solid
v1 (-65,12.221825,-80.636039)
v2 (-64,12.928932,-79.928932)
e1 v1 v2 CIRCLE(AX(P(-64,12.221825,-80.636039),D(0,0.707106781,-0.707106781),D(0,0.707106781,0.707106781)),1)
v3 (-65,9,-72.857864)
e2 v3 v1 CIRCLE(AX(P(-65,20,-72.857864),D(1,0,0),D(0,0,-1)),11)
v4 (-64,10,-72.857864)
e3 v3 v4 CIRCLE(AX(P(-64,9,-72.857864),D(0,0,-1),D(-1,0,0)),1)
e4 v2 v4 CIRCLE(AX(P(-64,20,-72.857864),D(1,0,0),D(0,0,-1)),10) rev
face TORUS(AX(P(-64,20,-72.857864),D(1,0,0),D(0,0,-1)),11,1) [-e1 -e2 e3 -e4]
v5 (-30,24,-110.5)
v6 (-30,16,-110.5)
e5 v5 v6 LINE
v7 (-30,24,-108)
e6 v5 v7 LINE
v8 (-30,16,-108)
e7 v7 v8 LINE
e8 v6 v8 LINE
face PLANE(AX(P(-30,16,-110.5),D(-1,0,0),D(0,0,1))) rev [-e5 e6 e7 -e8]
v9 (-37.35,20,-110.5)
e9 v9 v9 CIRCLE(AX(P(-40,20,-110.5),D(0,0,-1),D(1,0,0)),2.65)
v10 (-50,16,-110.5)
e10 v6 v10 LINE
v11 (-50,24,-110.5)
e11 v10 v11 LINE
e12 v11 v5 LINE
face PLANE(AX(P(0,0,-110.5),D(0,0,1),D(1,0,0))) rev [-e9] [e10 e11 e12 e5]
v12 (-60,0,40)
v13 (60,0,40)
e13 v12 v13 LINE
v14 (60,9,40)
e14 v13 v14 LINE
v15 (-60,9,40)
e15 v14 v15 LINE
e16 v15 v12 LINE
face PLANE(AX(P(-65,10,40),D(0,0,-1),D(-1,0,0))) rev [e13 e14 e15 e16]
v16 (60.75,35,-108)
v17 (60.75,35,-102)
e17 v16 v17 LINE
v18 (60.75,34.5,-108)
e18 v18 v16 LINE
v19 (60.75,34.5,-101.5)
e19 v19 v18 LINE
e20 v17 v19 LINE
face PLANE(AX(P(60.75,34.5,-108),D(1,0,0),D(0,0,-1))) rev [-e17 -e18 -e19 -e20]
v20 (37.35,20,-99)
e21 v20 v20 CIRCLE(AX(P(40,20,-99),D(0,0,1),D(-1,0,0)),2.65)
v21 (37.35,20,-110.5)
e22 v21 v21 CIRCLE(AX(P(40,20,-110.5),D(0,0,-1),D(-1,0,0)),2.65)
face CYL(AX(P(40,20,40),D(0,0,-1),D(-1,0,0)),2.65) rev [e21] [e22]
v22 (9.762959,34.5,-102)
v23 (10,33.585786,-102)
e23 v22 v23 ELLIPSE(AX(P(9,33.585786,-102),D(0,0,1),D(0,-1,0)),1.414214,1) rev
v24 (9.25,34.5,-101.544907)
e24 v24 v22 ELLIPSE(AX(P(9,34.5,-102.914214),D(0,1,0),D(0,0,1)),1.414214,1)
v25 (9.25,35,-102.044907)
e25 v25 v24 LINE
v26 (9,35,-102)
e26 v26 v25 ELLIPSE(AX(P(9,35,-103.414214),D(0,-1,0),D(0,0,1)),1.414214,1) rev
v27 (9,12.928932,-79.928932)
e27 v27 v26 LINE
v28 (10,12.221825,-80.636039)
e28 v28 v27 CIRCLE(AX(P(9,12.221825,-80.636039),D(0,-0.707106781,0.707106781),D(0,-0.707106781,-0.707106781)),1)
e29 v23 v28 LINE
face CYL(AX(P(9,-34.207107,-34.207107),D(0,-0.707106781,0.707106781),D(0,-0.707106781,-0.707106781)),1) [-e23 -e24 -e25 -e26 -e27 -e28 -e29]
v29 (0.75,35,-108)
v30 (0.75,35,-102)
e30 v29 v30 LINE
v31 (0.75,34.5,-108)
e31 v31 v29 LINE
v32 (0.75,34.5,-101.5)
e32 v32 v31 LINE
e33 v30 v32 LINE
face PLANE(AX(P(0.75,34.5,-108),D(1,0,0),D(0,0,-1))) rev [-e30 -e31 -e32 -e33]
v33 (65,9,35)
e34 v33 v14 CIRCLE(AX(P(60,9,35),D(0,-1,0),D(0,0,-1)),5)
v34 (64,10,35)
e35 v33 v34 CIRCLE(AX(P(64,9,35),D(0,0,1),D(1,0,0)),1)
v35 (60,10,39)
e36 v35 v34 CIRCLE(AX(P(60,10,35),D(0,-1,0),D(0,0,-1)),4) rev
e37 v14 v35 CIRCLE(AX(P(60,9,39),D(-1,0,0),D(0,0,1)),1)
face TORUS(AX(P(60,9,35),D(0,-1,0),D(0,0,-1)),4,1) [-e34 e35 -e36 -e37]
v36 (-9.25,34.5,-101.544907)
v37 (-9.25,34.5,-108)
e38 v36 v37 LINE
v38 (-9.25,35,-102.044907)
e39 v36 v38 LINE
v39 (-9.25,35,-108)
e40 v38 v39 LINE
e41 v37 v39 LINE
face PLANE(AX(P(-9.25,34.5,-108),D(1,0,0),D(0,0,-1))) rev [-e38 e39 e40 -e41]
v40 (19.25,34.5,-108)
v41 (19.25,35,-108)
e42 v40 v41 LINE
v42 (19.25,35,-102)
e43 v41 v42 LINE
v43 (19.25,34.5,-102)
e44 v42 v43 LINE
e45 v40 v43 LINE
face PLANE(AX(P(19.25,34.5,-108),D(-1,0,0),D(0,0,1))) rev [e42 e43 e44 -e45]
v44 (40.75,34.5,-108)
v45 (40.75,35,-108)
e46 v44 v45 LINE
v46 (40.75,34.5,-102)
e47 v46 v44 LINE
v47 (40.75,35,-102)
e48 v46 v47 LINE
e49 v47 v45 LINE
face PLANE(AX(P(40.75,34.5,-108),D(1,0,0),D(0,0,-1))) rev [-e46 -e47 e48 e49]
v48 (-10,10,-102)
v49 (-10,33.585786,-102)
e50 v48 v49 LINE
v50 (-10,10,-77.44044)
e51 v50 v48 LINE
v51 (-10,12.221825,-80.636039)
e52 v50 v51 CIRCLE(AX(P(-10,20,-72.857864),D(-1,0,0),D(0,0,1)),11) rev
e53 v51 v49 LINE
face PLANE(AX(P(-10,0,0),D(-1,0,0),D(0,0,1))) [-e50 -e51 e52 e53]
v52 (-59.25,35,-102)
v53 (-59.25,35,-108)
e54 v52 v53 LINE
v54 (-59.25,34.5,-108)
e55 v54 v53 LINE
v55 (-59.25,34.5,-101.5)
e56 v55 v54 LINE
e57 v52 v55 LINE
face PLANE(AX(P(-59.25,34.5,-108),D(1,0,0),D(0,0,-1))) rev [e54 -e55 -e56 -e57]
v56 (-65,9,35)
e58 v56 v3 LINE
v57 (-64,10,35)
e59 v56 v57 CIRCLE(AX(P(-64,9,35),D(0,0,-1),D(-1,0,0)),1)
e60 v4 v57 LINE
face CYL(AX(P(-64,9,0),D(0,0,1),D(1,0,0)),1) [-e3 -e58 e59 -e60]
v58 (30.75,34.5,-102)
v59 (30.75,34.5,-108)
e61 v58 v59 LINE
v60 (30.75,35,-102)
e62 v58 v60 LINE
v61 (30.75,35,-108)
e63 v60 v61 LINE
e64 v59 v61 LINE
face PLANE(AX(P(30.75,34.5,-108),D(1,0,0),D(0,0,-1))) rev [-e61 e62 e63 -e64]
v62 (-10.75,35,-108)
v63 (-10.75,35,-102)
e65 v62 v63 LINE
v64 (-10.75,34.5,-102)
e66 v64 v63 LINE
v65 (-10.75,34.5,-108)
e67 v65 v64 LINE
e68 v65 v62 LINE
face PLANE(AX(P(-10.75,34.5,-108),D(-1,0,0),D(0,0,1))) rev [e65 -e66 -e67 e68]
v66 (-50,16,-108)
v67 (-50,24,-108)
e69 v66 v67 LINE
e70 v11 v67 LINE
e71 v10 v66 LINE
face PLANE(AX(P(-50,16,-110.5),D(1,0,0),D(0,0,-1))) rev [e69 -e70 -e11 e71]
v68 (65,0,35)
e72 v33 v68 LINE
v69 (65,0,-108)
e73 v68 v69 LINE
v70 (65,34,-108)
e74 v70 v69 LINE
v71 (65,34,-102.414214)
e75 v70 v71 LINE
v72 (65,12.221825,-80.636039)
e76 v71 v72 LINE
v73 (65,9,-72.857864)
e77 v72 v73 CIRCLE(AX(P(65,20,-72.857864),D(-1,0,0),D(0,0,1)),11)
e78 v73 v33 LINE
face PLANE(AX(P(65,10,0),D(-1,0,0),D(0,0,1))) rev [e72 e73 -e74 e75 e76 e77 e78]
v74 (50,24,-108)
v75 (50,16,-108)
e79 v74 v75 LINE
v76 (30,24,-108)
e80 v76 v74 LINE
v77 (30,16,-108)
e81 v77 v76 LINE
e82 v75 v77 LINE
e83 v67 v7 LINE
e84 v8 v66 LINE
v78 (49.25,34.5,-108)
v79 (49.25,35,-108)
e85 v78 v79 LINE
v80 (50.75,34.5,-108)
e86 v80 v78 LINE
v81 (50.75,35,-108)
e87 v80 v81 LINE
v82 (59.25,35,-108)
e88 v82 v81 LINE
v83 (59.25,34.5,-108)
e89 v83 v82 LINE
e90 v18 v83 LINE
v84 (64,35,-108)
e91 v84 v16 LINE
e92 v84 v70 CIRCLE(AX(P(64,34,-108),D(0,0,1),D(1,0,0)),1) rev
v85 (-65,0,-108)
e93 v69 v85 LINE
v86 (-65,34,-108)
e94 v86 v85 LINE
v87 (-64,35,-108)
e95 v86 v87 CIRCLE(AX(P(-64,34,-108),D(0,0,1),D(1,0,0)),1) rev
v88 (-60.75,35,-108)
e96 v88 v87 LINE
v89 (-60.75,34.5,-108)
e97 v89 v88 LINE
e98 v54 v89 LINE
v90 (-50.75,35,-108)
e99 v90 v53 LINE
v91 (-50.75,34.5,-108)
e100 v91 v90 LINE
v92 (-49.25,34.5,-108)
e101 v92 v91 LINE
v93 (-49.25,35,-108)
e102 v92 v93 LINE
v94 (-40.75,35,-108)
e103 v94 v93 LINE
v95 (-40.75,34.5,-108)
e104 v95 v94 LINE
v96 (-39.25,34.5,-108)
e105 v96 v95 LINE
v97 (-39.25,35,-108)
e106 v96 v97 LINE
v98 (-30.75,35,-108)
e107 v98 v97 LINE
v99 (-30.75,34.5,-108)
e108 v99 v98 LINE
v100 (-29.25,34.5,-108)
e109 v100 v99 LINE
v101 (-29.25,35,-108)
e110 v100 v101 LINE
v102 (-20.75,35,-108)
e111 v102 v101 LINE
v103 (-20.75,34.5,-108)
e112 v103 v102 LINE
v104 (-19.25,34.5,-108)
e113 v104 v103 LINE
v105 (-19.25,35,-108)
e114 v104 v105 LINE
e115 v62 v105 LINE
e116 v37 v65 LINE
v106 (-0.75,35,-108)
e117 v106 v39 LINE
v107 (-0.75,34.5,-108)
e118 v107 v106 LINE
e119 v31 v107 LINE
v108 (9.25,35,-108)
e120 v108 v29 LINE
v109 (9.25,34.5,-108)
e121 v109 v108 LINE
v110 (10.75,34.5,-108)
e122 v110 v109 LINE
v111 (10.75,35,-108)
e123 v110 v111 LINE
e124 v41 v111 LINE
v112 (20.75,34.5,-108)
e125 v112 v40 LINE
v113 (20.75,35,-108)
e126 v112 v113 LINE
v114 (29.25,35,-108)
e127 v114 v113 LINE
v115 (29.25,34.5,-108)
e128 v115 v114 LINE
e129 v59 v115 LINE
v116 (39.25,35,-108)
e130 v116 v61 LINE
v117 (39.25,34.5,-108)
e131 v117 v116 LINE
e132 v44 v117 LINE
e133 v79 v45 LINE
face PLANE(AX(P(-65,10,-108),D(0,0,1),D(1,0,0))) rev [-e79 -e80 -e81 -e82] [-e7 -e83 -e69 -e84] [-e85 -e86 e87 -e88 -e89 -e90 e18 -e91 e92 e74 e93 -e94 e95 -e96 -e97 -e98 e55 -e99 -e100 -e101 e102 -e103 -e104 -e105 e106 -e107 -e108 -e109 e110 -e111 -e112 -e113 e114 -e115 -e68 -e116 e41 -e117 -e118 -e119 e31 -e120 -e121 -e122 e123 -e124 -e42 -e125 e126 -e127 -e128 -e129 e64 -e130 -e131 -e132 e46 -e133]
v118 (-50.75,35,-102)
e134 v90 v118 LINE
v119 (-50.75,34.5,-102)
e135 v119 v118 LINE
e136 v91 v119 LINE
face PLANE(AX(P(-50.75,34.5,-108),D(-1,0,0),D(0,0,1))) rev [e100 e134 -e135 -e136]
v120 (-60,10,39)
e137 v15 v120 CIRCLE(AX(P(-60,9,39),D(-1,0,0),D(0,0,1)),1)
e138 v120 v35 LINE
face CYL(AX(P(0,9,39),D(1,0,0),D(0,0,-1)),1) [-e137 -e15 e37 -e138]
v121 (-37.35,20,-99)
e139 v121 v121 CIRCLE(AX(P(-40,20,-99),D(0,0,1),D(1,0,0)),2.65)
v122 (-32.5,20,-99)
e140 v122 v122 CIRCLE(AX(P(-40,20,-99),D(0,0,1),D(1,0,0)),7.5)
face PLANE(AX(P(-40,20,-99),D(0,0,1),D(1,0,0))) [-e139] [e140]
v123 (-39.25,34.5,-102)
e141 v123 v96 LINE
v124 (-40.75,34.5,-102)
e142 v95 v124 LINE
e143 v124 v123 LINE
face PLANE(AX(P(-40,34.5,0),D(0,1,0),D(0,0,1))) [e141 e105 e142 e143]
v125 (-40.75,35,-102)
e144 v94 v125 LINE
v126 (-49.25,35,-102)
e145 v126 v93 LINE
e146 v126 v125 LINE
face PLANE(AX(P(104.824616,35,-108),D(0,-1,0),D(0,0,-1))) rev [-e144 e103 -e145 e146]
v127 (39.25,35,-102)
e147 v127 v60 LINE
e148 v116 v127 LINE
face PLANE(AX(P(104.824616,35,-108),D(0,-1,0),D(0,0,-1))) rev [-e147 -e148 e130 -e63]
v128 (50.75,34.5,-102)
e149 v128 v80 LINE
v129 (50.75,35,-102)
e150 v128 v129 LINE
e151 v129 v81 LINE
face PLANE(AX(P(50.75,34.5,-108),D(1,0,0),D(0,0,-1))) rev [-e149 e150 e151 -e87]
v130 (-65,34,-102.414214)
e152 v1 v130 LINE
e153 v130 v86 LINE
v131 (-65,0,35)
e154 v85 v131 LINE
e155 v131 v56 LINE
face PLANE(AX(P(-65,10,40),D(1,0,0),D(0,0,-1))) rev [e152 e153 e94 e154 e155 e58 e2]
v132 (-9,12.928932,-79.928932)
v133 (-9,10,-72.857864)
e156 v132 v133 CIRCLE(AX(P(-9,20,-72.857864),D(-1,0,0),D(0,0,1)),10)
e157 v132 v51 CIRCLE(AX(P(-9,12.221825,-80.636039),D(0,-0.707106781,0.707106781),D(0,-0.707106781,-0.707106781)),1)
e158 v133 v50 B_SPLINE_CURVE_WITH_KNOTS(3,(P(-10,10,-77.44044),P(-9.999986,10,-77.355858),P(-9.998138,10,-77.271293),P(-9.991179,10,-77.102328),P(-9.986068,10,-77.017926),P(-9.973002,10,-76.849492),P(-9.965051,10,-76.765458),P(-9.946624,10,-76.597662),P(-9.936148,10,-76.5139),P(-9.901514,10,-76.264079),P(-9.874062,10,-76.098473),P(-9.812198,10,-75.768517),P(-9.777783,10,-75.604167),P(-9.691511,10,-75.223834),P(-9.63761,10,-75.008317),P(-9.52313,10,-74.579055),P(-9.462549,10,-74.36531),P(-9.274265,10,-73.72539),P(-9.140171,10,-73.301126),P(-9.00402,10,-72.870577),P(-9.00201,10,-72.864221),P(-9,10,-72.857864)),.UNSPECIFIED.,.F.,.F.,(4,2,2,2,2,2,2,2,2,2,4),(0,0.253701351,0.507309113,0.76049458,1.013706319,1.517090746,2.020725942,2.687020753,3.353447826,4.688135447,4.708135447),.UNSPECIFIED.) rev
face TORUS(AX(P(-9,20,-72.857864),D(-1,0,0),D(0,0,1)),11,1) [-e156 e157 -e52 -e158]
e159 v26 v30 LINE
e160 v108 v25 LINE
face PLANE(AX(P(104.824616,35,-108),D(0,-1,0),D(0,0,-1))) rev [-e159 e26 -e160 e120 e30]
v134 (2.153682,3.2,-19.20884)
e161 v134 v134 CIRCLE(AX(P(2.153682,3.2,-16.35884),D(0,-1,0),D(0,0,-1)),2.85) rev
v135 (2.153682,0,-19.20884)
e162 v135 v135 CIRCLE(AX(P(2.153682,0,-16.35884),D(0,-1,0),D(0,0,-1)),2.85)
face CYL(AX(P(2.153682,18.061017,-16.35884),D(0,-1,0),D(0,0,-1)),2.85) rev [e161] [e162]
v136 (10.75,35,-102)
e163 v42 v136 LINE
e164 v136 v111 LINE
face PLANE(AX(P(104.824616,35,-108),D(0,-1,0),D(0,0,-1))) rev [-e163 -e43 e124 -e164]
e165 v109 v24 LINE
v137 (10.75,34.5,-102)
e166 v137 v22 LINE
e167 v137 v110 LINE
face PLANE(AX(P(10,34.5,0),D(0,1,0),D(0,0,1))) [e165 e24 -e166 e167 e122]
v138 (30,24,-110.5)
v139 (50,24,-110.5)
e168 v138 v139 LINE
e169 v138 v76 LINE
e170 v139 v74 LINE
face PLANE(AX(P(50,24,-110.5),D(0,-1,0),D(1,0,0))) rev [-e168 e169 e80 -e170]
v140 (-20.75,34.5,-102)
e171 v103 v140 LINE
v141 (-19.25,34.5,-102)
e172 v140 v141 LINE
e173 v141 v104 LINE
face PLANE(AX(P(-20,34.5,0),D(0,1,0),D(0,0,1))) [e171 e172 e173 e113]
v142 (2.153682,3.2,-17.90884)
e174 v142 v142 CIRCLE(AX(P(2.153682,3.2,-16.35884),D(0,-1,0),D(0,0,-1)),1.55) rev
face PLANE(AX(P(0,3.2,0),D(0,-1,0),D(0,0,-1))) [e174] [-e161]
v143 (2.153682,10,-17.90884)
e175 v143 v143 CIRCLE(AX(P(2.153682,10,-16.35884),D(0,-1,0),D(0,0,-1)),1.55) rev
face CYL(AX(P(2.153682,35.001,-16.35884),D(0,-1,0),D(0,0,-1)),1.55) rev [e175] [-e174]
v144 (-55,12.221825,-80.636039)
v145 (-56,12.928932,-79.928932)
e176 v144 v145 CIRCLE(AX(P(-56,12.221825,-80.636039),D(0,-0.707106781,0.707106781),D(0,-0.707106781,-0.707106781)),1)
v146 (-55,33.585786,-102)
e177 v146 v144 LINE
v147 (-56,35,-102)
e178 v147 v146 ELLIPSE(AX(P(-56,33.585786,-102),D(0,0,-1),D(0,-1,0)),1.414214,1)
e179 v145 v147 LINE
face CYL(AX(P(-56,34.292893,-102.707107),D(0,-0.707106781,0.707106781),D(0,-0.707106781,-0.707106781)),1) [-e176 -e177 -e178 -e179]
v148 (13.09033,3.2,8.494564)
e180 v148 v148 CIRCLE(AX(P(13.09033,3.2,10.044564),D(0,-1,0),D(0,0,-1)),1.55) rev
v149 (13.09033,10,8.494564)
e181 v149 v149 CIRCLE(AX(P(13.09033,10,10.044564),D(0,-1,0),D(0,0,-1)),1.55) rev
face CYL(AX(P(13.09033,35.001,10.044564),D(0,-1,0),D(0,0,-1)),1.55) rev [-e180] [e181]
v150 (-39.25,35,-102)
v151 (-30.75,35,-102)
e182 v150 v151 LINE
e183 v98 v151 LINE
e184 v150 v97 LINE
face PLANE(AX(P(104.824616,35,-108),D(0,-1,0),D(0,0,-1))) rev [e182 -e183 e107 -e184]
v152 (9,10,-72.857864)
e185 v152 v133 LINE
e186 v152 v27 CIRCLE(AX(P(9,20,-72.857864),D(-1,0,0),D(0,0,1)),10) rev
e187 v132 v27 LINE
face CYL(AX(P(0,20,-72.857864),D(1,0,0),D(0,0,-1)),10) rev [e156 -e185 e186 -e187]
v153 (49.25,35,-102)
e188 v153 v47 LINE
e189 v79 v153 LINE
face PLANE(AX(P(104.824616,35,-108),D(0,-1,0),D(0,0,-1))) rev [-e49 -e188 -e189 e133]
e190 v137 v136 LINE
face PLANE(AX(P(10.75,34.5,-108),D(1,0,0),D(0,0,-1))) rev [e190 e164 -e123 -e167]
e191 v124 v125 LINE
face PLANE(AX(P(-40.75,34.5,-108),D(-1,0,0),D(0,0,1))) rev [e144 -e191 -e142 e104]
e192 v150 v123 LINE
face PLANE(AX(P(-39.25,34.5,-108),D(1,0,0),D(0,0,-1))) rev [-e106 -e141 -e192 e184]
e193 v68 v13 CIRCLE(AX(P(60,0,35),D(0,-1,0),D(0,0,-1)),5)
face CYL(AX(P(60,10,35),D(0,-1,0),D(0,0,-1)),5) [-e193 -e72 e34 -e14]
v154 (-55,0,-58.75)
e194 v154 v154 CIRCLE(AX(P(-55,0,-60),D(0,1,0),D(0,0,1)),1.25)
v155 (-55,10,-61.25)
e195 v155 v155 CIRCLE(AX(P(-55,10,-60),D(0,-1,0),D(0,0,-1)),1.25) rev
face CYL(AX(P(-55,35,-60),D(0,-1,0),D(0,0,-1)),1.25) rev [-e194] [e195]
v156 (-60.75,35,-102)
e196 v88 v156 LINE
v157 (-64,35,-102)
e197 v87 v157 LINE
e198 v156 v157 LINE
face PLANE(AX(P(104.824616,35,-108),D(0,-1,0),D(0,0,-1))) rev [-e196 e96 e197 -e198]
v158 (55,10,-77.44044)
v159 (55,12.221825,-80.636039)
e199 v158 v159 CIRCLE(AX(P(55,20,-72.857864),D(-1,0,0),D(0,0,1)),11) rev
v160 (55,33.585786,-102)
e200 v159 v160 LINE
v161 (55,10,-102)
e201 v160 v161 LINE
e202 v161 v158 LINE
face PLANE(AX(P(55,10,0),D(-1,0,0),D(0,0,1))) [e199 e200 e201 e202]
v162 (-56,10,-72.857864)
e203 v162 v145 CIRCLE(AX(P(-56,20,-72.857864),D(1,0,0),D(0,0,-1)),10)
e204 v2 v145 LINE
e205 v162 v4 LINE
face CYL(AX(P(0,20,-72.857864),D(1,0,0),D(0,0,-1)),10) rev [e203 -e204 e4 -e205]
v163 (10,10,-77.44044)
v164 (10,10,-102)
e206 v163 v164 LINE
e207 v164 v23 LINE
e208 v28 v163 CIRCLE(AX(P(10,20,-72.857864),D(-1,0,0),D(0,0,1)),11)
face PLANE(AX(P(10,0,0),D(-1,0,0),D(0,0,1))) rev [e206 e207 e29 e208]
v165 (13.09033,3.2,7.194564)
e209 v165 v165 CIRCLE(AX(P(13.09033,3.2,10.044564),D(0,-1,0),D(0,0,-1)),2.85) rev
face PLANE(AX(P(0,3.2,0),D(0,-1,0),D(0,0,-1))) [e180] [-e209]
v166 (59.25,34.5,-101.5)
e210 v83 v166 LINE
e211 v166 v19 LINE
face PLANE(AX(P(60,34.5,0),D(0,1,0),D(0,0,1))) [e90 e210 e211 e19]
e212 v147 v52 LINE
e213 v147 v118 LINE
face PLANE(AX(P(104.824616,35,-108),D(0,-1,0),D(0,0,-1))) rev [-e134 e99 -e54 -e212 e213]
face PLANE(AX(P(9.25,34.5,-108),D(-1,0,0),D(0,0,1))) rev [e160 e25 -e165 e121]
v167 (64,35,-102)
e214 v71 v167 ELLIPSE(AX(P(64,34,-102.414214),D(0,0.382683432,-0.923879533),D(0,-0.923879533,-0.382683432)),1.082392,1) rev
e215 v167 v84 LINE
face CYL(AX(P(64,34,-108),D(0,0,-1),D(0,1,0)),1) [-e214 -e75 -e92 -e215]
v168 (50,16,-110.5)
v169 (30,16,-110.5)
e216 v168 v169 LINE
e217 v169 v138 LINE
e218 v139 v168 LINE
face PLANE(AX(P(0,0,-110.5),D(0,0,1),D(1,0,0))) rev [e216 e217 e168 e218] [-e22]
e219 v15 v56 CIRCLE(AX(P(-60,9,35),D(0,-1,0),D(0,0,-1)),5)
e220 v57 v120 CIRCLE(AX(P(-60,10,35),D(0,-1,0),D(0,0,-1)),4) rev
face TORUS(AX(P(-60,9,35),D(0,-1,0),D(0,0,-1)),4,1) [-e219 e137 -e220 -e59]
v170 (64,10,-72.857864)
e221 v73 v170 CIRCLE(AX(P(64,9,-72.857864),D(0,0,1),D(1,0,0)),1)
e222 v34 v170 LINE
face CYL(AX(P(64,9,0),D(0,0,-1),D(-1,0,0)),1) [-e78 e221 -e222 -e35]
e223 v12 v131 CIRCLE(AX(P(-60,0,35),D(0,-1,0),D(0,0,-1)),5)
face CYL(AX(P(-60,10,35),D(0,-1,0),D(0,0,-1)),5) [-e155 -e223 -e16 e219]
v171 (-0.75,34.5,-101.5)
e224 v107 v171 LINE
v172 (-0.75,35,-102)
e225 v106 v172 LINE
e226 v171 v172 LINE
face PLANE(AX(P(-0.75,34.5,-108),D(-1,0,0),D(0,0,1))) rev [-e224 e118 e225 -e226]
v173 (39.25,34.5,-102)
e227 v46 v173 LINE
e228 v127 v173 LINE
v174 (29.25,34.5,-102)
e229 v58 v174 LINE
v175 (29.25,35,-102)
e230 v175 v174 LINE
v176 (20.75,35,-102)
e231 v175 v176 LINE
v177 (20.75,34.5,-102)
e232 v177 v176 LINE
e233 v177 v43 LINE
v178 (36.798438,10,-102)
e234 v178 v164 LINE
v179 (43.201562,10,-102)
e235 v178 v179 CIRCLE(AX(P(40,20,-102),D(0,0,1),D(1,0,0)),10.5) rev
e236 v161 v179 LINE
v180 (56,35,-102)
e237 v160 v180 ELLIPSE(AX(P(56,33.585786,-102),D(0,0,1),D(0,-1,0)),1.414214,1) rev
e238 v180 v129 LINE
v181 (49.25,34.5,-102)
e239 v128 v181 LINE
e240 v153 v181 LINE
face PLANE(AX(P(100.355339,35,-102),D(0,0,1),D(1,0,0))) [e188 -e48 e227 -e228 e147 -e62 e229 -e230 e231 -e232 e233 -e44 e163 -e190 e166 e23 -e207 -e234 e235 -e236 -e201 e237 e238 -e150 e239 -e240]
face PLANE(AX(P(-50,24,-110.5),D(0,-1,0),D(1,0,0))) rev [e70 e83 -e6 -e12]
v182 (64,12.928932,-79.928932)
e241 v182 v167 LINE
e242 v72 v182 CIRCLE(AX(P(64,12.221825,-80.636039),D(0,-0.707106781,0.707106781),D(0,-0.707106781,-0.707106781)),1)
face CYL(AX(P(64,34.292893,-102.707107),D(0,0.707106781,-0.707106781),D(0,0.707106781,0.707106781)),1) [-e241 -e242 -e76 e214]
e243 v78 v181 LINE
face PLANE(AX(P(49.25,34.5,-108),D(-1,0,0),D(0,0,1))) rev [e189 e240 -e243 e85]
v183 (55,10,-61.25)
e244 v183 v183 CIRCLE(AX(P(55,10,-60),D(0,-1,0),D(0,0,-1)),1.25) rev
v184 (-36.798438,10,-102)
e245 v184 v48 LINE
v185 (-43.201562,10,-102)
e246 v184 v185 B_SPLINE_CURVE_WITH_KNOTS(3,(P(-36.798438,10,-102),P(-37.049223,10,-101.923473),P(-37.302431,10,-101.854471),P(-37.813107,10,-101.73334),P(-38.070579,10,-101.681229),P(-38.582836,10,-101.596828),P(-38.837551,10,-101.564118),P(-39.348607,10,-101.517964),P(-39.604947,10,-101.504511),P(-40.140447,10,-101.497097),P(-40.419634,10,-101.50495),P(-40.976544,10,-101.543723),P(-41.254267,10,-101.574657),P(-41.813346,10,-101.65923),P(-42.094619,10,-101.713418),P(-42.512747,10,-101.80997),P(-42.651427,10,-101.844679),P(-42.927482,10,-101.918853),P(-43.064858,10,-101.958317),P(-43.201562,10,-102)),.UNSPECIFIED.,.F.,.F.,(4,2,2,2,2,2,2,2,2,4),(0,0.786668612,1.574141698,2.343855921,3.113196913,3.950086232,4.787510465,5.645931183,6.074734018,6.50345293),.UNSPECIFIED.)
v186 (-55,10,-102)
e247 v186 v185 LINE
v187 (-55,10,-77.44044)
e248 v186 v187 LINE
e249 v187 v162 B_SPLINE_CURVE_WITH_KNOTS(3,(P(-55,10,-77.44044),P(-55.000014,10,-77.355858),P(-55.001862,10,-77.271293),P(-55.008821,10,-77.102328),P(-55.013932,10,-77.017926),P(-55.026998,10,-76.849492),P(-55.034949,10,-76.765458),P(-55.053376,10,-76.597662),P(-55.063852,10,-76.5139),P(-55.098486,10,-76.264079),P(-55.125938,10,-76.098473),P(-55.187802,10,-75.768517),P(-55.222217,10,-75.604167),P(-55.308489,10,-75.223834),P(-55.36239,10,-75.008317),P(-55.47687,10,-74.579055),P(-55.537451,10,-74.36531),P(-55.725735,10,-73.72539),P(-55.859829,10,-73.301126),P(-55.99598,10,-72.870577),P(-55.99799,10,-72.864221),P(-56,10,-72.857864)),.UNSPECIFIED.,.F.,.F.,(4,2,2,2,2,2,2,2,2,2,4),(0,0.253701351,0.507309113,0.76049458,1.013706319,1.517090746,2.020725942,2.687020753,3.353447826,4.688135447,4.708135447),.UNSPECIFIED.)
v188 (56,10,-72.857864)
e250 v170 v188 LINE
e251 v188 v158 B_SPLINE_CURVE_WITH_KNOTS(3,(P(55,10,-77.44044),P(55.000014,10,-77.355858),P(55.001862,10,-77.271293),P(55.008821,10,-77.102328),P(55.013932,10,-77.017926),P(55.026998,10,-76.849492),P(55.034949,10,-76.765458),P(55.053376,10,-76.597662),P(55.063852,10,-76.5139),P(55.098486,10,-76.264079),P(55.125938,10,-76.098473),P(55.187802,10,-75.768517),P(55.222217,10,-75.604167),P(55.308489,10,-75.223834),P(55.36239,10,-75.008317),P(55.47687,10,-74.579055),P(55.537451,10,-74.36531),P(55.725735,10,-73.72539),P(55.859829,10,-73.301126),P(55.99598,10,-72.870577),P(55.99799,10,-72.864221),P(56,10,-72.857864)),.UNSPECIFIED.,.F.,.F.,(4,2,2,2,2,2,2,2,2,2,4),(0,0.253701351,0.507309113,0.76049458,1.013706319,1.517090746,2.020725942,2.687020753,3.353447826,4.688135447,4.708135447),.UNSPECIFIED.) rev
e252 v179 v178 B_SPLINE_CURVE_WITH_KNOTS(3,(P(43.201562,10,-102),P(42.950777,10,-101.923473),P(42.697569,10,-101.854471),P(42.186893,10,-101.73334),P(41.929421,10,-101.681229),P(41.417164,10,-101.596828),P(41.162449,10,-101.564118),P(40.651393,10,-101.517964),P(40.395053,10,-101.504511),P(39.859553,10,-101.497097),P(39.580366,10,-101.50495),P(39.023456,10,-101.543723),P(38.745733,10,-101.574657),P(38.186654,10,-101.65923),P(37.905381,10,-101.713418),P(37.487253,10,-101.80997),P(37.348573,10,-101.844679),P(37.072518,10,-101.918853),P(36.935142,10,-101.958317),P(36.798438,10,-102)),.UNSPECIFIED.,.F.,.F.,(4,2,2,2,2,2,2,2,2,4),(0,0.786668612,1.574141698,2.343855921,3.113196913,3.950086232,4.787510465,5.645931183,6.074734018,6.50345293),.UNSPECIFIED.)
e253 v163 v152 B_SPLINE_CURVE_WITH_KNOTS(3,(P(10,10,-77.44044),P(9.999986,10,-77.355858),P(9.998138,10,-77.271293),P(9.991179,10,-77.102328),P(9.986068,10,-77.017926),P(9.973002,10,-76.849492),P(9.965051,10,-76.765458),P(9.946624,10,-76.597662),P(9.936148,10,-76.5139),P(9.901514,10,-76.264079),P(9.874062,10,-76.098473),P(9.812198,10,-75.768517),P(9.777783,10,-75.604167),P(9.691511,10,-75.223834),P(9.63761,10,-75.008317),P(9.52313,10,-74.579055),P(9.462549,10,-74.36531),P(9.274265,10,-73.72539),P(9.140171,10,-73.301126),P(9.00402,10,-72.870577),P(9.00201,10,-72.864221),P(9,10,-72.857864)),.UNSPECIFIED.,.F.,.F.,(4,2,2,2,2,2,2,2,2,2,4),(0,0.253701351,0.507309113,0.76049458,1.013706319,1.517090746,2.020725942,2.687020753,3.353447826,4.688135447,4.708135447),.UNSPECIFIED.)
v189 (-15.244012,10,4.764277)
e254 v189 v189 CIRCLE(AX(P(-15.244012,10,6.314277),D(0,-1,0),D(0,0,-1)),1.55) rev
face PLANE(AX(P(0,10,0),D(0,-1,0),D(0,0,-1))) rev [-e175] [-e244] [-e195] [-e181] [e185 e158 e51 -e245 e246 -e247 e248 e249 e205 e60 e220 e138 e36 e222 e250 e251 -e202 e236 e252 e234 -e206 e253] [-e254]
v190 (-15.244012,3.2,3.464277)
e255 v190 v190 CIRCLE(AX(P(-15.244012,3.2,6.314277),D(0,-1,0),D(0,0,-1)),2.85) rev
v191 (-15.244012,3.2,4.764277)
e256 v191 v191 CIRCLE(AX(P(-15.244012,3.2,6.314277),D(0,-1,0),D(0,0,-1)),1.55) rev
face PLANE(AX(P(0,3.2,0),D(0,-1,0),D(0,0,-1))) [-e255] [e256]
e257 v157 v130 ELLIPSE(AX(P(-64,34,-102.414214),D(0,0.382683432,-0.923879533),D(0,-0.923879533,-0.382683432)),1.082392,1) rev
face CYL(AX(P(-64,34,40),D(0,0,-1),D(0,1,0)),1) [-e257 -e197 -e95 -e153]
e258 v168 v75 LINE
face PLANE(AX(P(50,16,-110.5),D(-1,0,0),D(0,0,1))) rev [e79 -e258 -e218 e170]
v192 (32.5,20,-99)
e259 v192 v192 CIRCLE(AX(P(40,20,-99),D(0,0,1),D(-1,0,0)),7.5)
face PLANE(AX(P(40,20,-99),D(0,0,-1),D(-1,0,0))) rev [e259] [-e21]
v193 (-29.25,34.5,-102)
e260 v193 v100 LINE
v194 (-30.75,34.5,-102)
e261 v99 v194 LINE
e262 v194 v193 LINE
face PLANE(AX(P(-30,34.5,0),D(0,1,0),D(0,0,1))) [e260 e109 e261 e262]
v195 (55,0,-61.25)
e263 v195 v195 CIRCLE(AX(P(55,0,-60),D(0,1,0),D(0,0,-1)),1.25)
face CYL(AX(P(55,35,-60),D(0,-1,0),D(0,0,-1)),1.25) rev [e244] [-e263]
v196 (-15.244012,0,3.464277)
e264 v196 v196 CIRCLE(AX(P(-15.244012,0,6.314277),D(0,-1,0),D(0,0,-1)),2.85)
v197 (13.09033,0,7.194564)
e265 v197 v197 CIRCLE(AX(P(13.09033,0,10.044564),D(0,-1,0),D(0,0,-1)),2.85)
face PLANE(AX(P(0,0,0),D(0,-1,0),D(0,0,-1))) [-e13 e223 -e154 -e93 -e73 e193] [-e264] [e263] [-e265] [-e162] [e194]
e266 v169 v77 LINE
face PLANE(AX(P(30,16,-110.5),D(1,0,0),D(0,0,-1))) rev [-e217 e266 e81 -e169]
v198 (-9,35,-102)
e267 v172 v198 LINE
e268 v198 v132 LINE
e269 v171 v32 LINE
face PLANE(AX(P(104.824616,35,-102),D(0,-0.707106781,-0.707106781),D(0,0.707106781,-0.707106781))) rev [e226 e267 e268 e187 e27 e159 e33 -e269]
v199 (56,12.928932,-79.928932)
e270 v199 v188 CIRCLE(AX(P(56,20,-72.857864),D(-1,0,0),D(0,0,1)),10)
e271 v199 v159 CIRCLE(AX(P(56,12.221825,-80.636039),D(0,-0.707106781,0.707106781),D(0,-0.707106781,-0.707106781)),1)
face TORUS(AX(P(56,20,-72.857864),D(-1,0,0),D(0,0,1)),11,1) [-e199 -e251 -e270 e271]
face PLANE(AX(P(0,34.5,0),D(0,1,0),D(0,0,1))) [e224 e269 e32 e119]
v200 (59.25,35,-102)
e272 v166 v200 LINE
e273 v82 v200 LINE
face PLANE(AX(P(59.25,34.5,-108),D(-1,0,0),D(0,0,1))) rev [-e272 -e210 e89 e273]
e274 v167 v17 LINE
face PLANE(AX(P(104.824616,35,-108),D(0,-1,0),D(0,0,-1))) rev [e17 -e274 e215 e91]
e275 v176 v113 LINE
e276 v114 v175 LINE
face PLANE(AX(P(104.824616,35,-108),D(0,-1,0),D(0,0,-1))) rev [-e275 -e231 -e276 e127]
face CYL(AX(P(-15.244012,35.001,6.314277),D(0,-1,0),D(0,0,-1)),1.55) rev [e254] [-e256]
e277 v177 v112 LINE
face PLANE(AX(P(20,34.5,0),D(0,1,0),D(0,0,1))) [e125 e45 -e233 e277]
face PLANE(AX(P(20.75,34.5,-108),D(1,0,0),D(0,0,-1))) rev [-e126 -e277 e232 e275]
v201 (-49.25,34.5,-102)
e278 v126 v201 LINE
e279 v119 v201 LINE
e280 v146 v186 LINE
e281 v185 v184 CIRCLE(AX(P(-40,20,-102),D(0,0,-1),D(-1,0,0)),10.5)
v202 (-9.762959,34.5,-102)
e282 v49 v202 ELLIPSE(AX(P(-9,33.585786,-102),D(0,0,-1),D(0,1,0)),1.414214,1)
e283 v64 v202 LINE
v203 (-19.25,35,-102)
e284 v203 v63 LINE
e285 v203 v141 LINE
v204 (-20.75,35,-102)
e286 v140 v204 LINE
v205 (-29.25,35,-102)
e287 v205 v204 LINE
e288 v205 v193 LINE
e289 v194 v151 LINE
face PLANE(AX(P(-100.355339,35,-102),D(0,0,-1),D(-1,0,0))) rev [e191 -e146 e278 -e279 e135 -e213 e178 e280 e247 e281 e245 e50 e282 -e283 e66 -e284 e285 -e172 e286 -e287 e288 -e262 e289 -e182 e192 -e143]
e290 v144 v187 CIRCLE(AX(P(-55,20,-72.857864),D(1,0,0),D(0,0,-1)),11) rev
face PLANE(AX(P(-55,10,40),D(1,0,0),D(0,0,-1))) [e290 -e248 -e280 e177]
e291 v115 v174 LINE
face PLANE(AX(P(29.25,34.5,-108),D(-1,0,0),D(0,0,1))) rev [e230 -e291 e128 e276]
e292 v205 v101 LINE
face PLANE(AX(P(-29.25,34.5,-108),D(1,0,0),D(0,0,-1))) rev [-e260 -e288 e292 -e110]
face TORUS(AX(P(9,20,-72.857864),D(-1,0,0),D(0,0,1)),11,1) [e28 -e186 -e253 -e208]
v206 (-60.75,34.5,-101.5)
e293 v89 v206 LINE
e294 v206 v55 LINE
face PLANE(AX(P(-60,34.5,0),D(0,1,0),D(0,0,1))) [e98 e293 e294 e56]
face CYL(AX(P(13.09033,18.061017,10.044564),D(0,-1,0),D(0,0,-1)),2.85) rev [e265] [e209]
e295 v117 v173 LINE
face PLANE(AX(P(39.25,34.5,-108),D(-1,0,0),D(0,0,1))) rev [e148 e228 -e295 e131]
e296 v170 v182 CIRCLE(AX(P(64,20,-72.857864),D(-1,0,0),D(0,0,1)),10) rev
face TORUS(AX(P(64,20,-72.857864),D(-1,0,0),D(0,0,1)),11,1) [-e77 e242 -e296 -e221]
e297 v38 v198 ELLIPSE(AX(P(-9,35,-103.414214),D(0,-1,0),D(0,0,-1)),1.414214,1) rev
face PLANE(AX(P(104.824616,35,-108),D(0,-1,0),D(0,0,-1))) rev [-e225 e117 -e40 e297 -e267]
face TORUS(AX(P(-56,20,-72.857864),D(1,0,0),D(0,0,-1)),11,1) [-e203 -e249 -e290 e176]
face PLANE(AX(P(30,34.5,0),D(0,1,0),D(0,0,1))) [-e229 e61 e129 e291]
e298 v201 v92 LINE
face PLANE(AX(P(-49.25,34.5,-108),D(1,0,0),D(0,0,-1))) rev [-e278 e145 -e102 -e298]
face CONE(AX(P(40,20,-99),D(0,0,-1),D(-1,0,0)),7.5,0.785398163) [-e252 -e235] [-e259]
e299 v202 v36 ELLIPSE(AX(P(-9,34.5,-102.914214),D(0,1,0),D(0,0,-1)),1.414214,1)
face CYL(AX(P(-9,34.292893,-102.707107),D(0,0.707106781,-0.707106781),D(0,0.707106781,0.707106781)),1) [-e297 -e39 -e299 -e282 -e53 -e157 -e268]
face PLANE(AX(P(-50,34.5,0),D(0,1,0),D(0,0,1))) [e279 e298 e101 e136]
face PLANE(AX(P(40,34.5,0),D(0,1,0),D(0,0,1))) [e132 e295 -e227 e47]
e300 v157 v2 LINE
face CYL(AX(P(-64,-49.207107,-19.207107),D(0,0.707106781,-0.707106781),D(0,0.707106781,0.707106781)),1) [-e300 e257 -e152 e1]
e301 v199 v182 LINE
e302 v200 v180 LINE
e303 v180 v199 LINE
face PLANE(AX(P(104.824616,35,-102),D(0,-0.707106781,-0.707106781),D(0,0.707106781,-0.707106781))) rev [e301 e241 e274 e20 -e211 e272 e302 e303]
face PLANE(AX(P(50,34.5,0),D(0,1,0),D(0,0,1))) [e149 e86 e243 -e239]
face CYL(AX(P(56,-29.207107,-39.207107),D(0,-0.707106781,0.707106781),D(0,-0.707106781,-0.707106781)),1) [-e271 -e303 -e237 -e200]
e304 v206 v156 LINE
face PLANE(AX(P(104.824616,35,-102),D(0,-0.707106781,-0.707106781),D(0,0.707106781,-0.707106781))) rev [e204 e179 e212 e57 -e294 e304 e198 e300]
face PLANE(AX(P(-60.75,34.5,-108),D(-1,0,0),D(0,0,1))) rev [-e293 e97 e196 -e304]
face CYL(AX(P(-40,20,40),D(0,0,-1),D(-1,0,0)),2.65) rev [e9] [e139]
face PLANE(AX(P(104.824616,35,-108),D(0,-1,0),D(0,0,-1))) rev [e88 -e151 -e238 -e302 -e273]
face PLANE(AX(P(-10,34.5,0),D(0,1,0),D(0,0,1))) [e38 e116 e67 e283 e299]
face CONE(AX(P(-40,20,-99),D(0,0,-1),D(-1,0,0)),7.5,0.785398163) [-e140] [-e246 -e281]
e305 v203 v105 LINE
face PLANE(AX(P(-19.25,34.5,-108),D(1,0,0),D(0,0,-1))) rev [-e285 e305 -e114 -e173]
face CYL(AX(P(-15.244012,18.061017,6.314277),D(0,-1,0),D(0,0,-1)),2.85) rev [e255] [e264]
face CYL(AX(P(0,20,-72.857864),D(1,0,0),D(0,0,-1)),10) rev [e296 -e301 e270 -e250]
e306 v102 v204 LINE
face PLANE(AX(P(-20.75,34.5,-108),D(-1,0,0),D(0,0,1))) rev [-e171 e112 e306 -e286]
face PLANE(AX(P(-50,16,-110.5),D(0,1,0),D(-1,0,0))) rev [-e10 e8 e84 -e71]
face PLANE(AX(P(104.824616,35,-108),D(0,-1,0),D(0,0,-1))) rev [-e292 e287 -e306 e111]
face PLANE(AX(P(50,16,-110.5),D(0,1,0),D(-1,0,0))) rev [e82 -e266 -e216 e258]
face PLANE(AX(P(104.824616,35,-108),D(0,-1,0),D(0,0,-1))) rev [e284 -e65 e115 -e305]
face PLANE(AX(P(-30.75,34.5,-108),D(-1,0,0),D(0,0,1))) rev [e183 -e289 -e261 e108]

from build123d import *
from build123d.topology import SkipClean

# Parameters (mm, degrees)
AUFSATZ_LINEAR_AUSTRAGEN1_DEPTH             = 10
AUFSATZ_LINEAR_AUSTRAGEN2_REACH             = 128.448
AUFSATZ_LINEAR_AUSTRAGEN2_DIRECTION_2_REACH = 128.448
SCHNITT_LINEAR_AUSTRAGEN1_DEPTH             = 45
SCHNITT_LINEAR_AUSTRAGEN2_DEPTH             = 45
SKIZZE5_W                                   = 20
SKIZZE5_H                                   = 8
AUFSATZ_LINEAR_AUSTRAGEN3_DEPTH             = 2.5
SKIZZE6_R                                   = 2.65
SCHNITT_LINEAR_AUSTRAGEN3_DEPTH             = 168.631291828
VERRUNDUNG1_R                               = 10
VERRUNDUNG2_R                               = 5
SCHNITT_LINEAR_AUSTRAGEN4_REACH             = 134.892
SKIZZE7_R                                   = 1.55
SKIZZE8_R                                   = 2.85
SCHNITT_LINEAR_AUSTRAGEN5_DEPTH             = 3.2
SKIZZE9_W                                   = 1.5
SKIZZE9_H                                   = 10
SCHNITT_LINEAR_AUSTRAGEN6_DEPTH             = 0.5
LINEARES_MUSTER1_COUNT                      = 8
LINEARES_MUSTER1_PITCH                      = 10
LINEARES_MUSTER2_COUNT                      = 8
LINEARES_MUSTER2_PITCH                      = 10
VERRUNDUNG3_R                               = 1
SKIZZE10_R                                  = 7.5
SKIZZE10_R_2                                = 2.65
AUFSATZ_LINEAR_AUSTRAGEN4_DEPTH             = 3
FASE1_SIZE                                  = 3
SKIZZE11_R                                  = 1.25
SCHNITT_LINEAR_AUSTRAGEN8_DEPTH             = 133.891873341


with BuildPart() as part:
    # Skizze1 → Aufsatz-Linear austragen1 (new body)
    with BuildSketch(Plane(origin=(0, 0, 0), x_dir=(1, 0, 0), z_dir=(0, 1, 0))):
        Polygon((-65, -40), (-65, 0), (-65, 108), (65, 108), (65, 0), (65, -40), align=None)
    extrude(amount=AUFSATZ_LINEAR_AUSTRAGEN1_DEPTH)

    # Aufsatz-Linear austragen2: up to this face of the body (flat: up to its plane)
    aufsatz_linear_austragen2_end = Plane(part.part.faces().sort_by_distance((65, 5, -34))[0])
    # Skizze2 → Aufsatz-Linear austragen2 (add, up to the picked face)
    with BuildSketch(Plane(origin=(0, 0, 0), x_dir=(0, 0, -1), z_dir=(1, 0, 0)), mode=Mode.PRIVATE) as aufsatz_linear_austragen2_sk1:
        Polygon((108, 10), (108, 35), (102, 35), (77, 10), align=None)
    aufsatz_linear_austragen2_tool1 = split(extrude(aufsatz_linear_austragen2_sk1.sketch, amount=AUFSATZ_LINEAR_AUSTRAGEN2_REACH, mode=Mode.PRIVATE), bisect_by=aufsatz_linear_austragen2_end, keep=Keep.BOTH, mode=Mode.PRIVATE)
    add(aufsatz_linear_austragen2_tool1.solids().sort_by(Axis((0, 19.684685, -97.342342), (1, 0, 0)))[0])

    # Aufsatz-Linear austragen2 direction 2: up to this face of the body (flat: up to its plane)
    aufsatz_linear_austragen2_direction_2_end = Plane(part.part.faces().sort_by_distance((-65, 5, -34))[0])
    # Skizze2 → Aufsatz-Linear austragen2 direction 2 (add, up to the picked face)
    with BuildSketch(Plane(origin=(0, 0, 0), x_dir=(0, 0, -1), z_dir=(1, 0, 0)), mode=Mode.PRIVATE) as aufsatz_linear_austragen2_direction_2_sk1:
        Polygon((108, 10), (108, 35), (102, 35), (77, 10), align=None)
    aufsatz_linear_austragen2_direction_2_tool1 = split(extrude(aufsatz_linear_austragen2_direction_2_sk1.sketch, amount=-AUFSATZ_LINEAR_AUSTRAGEN2_DIRECTION_2_REACH, mode=Mode.PRIVATE), bisect_by=aufsatz_linear_austragen2_direction_2_end, keep=Keep.BOTH, mode=Mode.PRIVATE)
    add(aufsatz_linear_austragen2_direction_2_tool1.solids().sort_by(Axis((0, 19.684685, -97.342342), (-1, 0, 0)))[0])

    # Skizze3 → Schnitt-Linear austragen1 (cut)
    with BuildSketch(Plane(origin=(10, 0, 0), x_dir=(0, 0, -1), z_dir=(1, 0, 0))):
        Polygon((102, 35), (102, 10), (77, 10), align=None)
    extrude(amount=SCHNITT_LINEAR_AUSTRAGEN1_DEPTH, mode=Mode.SUBTRACT)

    # Skizze4 → Schnitt-Linear austragen2 (cut)
    with BuildSketch(Plane(origin=(-10, 0, 0), x_dir=(0, 0, -1), z_dir=(1, 0, 0))):
        Polygon((102, 35), (102, 10), (77, 10), align=None)
    extrude(amount=-SCHNITT_LINEAR_AUSTRAGEN2_DEPTH, mode=Mode.SUBTRACT)

    # Skizze5 → Aufsatz-Linear austragen3 (add)
    with BuildSketch(Plane(origin=(0, 0, -108), x_dir=(-1, 0, 0), z_dir=(0, 0, -1))):
        with Locations((-40, 20)):
            Rectangle(SKIZZE5_W, SKIZZE5_H)
        with Locations((40, 20)):
            Rectangle(SKIZZE5_W, SKIZZE5_H)
    extrude(amount=AUFSATZ_LINEAR_AUSTRAGEN3_DEPTH)

    # Skizze6 → Schnitt-Linear austragen3 (cut, through all)
    with BuildSketch(Plane(origin=(0, 0, -110.5), x_dir=(-1, 0, 0), z_dir=(0, 0, -1))):
        with Locations((-40, 20)):
            Circle(SKIZZE6_R)
        with Locations((40, 20)):
            Circle(SKIZZE6_R)
    extrude(amount=-SCHNITT_LINEAR_AUSTRAGEN3_DEPTH, mode=Mode.SUBTRACT)

    # Verrundung1
    verrundung1_edges = [part.edges().sort_by_distance(p)[0] for p in [
        (60, 10, -77),
        (0, 10, -77),
        (-60, 10, -77),
    ]]
    fillet(verrundung1_edges, radius=VERRUNDUNG1_R)

    # Verrundung2
    verrundung2_edges = [part.edges().sort_by_distance(p)[0] for p in [
        (65, 5, 40),
        (-65, 5, 40),
    ]]
    fillet(verrundung2_edges, radius=VERRUNDUNG2_R)

    # Skizze7 → Schnitt-Linear austragen4 (cut, up to next)
    with BuildSketch(Plane.XZ, mode=Mode.PRIVATE) as schnitt_linear_austragen4_sk1:
        with Locations(Location((-15.244012286, 6.314276634, 0), (0, 0, 270))):
            Circle(SKIZZE7_R)
    schnitt_linear_austragen4_tool1 = extrude(schnitt_linear_austragen4_sk1.sketch, amount=-SCHNITT_LINEAR_AUSTRAGEN4_REACH, mode=Mode.PRIVATE) & part.part
    # Skizze7 → Schnitt-Linear austragen4 (cut, up to next)
    with BuildSketch(Plane.XZ, mode=Mode.PRIVATE) as schnitt_linear_austragen4_sk2:
        with Locations(Location((13.090330115, 10.044563579, 0), (0, 0, 270))):
            Circle(SKIZZE7_R)
    schnitt_linear_austragen4_tool2 = extrude(schnitt_linear_austragen4_sk2.sketch, amount=-SCHNITT_LINEAR_AUSTRAGEN4_REACH, mode=Mode.PRIVATE) & part.part
    # Skizze7 → Schnitt-Linear austragen4 (cut, up to next)
    with BuildSketch(Plane.XZ, mode=Mode.PRIVATE) as schnitt_linear_austragen4_sk3:
        with Locations(Location((2.153682172, -16.358840213, 0), (0, 0, 270))):
            Circle(SKIZZE7_R)
    schnitt_linear_austragen4_tool3 = extrude(schnitt_linear_austragen4_sk3.sketch, amount=-SCHNITT_LINEAR_AUSTRAGEN4_REACH, mode=Mode.PRIVATE) & part.part
    add(schnitt_linear_austragen4_tool1.solids().sort_by_distance((-15.244012, 0, 6.314277))[0], mode=Mode.SUBTRACT)
    add(schnitt_linear_austragen4_tool2.solids().sort_by_distance((13.09033, 0, 10.044564))[0], mode=Mode.SUBTRACT)
    add(schnitt_linear_austragen4_tool3.solids().sort_by_distance((2.153682, 0, -16.35884))[0], mode=Mode.SUBTRACT)

    # Skizze8 → Schnitt-Linear austragen5 (cut)
    with BuildSketch(Plane.XZ):
        with Locations(Location((2.153682172, -16.358840213, 0), (0, 0, 270))):
            Circle(SKIZZE8_R)
        with Locations(Location((13.090330115, 10.044563579, 0), (0, 0, 270))):
            Circle(SKIZZE8_R)
        with Locations(Location((-15.244012286, 6.314276634, 0), (0, 0, 270))):
            Circle(SKIZZE8_R)
    extrude(amount=-SCHNITT_LINEAR_AUSTRAGEN5_DEPTH, mode=Mode.SUBTRACT)

    # Skizze9 → Schnitt-Linear austragen6 (cut)
    with BuildSketch(Plane(origin=(0, 35, 0), x_dir=(1, 0, 0), z_dir=(0, 1, 0))):
        with Locations((0, 103)):
            Rectangle(SKIZZE9_W, SKIZZE9_H)
    schnitt_linear_austragen6 = extrude(amount=-SCHNITT_LINEAR_AUSTRAGEN6_DEPTH, mode=Mode.SUBTRACT)

    # Lineares Muster1: Schnitt-Linear austragen6 ×8
    with Locations(*[(i * LINEARES_MUSTER1_PITCH, 0, 0) for i in range(1, LINEARES_MUSTER1_COUNT)]):
        add(schnitt_linear_austragen6, mode=Mode.SUBTRACT)

    # Lineares Muster2: Schnitt-Linear austragen6 ×8
    with Locations(*[(-i * LINEARES_MUSTER2_PITCH, 0, 0) for i in range(1, LINEARES_MUSTER2_COUNT)]):
        add(schnitt_linear_austragen6, mode=Mode.SUBTRACT)

    # Verrundung3
    # the kernel refuses this fillet: 1 mm, written as the material it takes off along each edge
    with BuildSketch(Plane(origin=(-55, 20, -72.857864376), x_dir=(0, -0.7316375364026848, 0.681693857480475), z_dir=(0, 0.681693857480475, 0.7316375364026848))) as verrundung3_piece_1_section:
        with BuildLine():
            CenterArc((10 + VERRUNDUNG3_R, -VERRUNDUNG3_R), VERRUNDUNG3_R, 90, 90)
            Line((10 + VERRUNDUNG3_R, 0), (10, 0))
            Line((10, 0), (10, -VERRUNDUNG3_R))
        make_face()
    verrundung3_piece_1 = revolve(axis=Axis((-55, 20, -72.857864376), (1, 0, 0)), revolution_arc=87.976149259, mode=Mode.PRIVATE)
    verrundung3_piece_1 = split(verrundung3_piece_1, bisect_by=Plane(origin=(-55, 10, -72.857864376), z_dir=(0, 1, 0)), keep=Keep.TOP, mode=Mode.PRIVATE)
    add(verrundung3_piece_1, mode=Mode.SUBTRACT)
    with BuildSketch(Plane(origin=(-10, 20, -72.857864376), x_dir=(0, -0.7316375364026848, 0.681693857480475), z_dir=(0, 0.681693857480475, 0.7316375364026848))) as verrundung3_piece_2_section:
        with BuildLine():
            CenterArc((10 + VERRUNDUNG3_R, VERRUNDUNG3_R), VERRUNDUNG3_R, 180, 90)
            Line((10 + VERRUNDUNG3_R, 0), (10, 0))
            Line((10, 0), (10, VERRUNDUNG3_R))
        make_face()
    verrundung3_piece_2 = revolve(axis=Axis((-10, 20, -72.857864376), (1, 0, 0)), revolution_arc=87.976149259, mode=Mode.PRIVATE)
    verrundung3_piece_2 = split(verrundung3_piece_2, bisect_by=Plane(origin=(-10, 10, -72.857864376), z_dir=(0, 1, 0)), keep=Keep.TOP, mode=Mode.PRIVATE)
    add(verrundung3_piece_2, mode=Mode.SUBTRACT)
    with BuildSketch(Plane(origin=(10, 20, -72.857864376), x_dir=(0, -0.7316375364026848, 0.681693857480475), z_dir=(0, 0.681693857480475, 0.7316375364026848))) as verrundung3_piece_3_section:
        with BuildLine():
            CenterArc((10 + VERRUNDUNG3_R, -VERRUNDUNG3_R), VERRUNDUNG3_R, 90, 90)
            Line((10, -VERRUNDUNG3_R), (10, 0))
            Line((10, 0), (10 + VERRUNDUNG3_R, 0))
        make_face()
    verrundung3_piece_3 = revolve(axis=Axis((10, 20, -72.857864376), (1, 0, 0)), revolution_arc=87.976149259, mode=Mode.PRIVATE)
    verrundung3_piece_3 = split(verrundung3_piece_3, bisect_by=Plane(origin=(10, 10, -72.857864376), z_dir=(0, 1, 0)), keep=Keep.TOP, mode=Mode.PRIVATE)
    add(verrundung3_piece_3, mode=Mode.SUBTRACT)
    with BuildSketch(Plane(origin=(55, 20, -72.857864376), x_dir=(0, -0.7316375364026848, 0.681693857480475), z_dir=(0, 0.681693857480475, 0.7316375364026848))) as verrundung3_piece_4_section:
        with BuildLine():
            CenterArc((10 + VERRUNDUNG3_R, VERRUNDUNG3_R), VERRUNDUNG3_R, 180, 90)
            Line((10 + VERRUNDUNG3_R, 0), (10, 0))
            Line((10, 0), (10, VERRUNDUNG3_R))
        make_face()
    verrundung3_piece_4 = revolve(axis=Axis((55, 20, -72.857864376), (1, 0, 0)), revolution_arc=87.976149259, mode=Mode.PRIVATE)
    verrundung3_piece_4 = split(verrundung3_piece_4, bisect_by=Plane(origin=(55, 10, -72.857864376), z_dir=(0, 1, 0)), keep=Keep.TOP, mode=Mode.PRIVATE)
    add(verrundung3_piece_4, mode=Mode.SUBTRACT)
    with BuildSketch(Plane(origin=(-65, 36.767766953, -103.767766953), x_dir=(1.421085471520189e-14, -0.7071067811865517, -0.7071067811865435), z_dir=(0, -0.7071067811865435, 0.7071067811865517))) as verrundung3_piece_5:
        with BuildLine():
            CenterArc((VERRUNDUNG3_R, VERRUNDUNG3_R), VERRUNDUNG3_R, 180, 90)
            Line((0, VERRUNDUNG3_R), (0, 0))
            Line((0, 0), (VERRUNDUNG3_R, 0))
        make_face()
    extrude(amount=33.713203436, mode=Mode.SUBTRACT)
    with BuildSketch(Plane(origin=(-55, 12.928932188, -79.928932188), x_dir=(-1, 0, 0), z_dir=(0, 0.7071067811865436, -0.7071067811865515))) as verrundung3_piece_6_section:
        with BuildLine():
            CenterArc((VERRUNDUNG3_R, -VERRUNDUNG3_R), VERRUNDUNG3_R, 90, 90)
            Line((0, -VERRUNDUNG3_R), (0, 0))
            Line((0, 0), (VERRUNDUNG3_R, 0))
        make_face()
    verrundung3_piece_6 = extrude(amount=33.713203436, mode=Mode.PRIVATE)
    verrundung3_piece_6 = split(verrundung3_piece_6, bisect_by=Plane(origin=(-55, 12.928932188, -102), z_dir=(0, 0, 1)), keep=Keep.TOP, mode=Mode.PRIVATE)
    add(verrundung3_piece_6, mode=Mode.SUBTRACT)
    with BuildSketch(Plane(origin=(-65, 20, -72.857864376), x_dir=(0, -1, 0), z_dir=(0, 0, 1))) as verrundung3_piece_7:
        with BuildLine():
            CenterArc((10 + VERRUNDUNG3_R, VERRUNDUNG3_R), VERRUNDUNG3_R, 180, 90)
            Line((10, VERRUNDUNG3_R), (10, 0))
            Line((10, 0), (10 + VERRUNDUNG3_R, 0))
        make_face()
    revolve(axis=Axis((-65, 20, -72.857864376), (1, 0, 0)), revolution_arc=45, mode=Mode.SUBTRACT)
    with BuildSketch(Plane(origin=(-65, 10, 35), x_dir=(0, -1, 0), z_dir=(0, 0, -1))) as verrundung3_piece_8:
        with BuildLine():
            CenterArc((VERRUNDUNG3_R, -VERRUNDUNG3_R), VERRUNDUNG3_R, 90, 90)
            Line((0, -VERRUNDUNG3_R), (0, 0))
            Line((0, 0), (VERRUNDUNG3_R, 0))
        make_face()
    extrude(amount=107.857864376, mode=Mode.SUBTRACT)
    with BuildSketch(Plane(origin=(-60, 10, 35), x_dir=(-1, 0, 0), z_dir=(0, 0, -1))) as verrundung3_piece_9:
        with BuildLine():
            CenterArc((5 - VERRUNDUNG3_R, -VERRUNDUNG3_R), VERRUNDUNG3_R, 0, 90)
            Line((5, -VERRUNDUNG3_R), (5, 0))
            Line((5, 0), (5 - VERRUNDUNG3_R, 0))
        make_face()
    revolve(axis=Axis((-60, 10, 35), (0, 1, 0)), revolution_arc=90, mode=Mode.SUBTRACT)
    with BuildSketch(Plane(origin=(55, 12.928932188, -79.928932188), x_dir=(0, -0.7071067811865513, -0.7071067811865438), z_dir=(0, 0.7071067811865438, -0.7071067811865513))) as verrundung3_piece_10_section:
        with BuildLine():
            CenterArc((VERRUNDUNG3_R, -VERRUNDUNG3_R), VERRUNDUNG3_R, 90, 90)
            Line((0, -VERRUNDUNG3_R), (0, 0))
            Line((0, 0), (VERRUNDUNG3_R, 0))
        make_face()
    verrundung3_piece_10 = extrude(amount=33.713203436, mode=Mode.PRIVATE)
    verrundung3_piece_10 = split(verrundung3_piece_10, bisect_by=Plane(origin=(55, 12.928932188, -102), z_dir=(0, 0, 1)), keep=Keep.TOP, mode=Mode.PRIVATE)
    add(verrundung3_piece_10, mode=Mode.SUBTRACT)
    with BuildSketch(Plane(origin=(65, 36.767766953, -103.767766953), x_dir=(0, -0.7071067811865517, -0.7071067811865435), z_dir=(0, -0.7071067811865435, 0.7071067811865517))) as verrundung3_piece_11:
        with BuildLine():
            CenterArc((VERRUNDUNG3_R, -VERRUNDUNG3_R), VERRUNDUNG3_R, 90, 90)
            Line((0, -VERRUNDUNG3_R), (0, 0))
            Line((0, 0), (VERRUNDUNG3_R, 0))
        make_face()
    extrude(amount=33.713203436, mode=Mode.SUBTRACT)
    with BuildSketch(Plane(origin=(65, 20, -72.857864376), x_dir=(0, -1, 0), z_dir=(0, 0, 1))) as verrundung3_piece_12:
        with BuildLine():
            CenterArc((10 + VERRUNDUNG3_R, -VERRUNDUNG3_R), VERRUNDUNG3_R, 90, 90)
            Line((10, -VERRUNDUNG3_R), (10, 0))
            Line((10, 0), (10 + VERRUNDUNG3_R, 0))
        make_face()
    revolve(axis=Axis((65, 20, -72.857864376), (1, 0, 0)), revolution_arc=45, mode=Mode.SUBTRACT)
    with BuildSketch(Plane(origin=(65, 10, -72.857864376), x_dir=(-1, 0, 0), z_dir=(0, 0, 1))) as verrundung3_piece_13:
        with BuildLine():
            CenterArc((VERRUNDUNG3_R, VERRUNDUNG3_R), VERRUNDUNG3_R, 180, 90)
            Line((0, VERRUNDUNG3_R), (0, 0))
            Line((0, 0), (VERRUNDUNG3_R, 0))
        make_face()
    extrude(amount=107.857864376, mode=Mode.SUBTRACT)
    with BuildSketch(Plane(origin=(60, 10, 35), x_dir=(1, 0, 0), z_dir=(0, 0, -1))) as verrundung3_piece_14:
        with BuildLine():
            CenterArc((5 - VERRUNDUNG3_R, VERRUNDUNG3_R), VERRUNDUNG3_R, 270, 90)
            Line((5, VERRUNDUNG3_R), (5, 0))
            Line((5, 0), (5 - VERRUNDUNG3_R, 0))
        make_face()
    revolve(axis=Axis((60, 10, 35), (0, -1, 0)), revolution_arc=90, mode=Mode.SUBTRACT)
    with BuildSketch(Plane(origin=(-10, 12.928932188, -79.928932188), x_dir=(0, -0.7071067811865516, -0.7071067811865436), z_dir=(0, 0.7071067811865436, -0.7071067811865515))) as verrundung3_piece_15_section:
        with BuildLine():
            CenterArc((VERRUNDUNG3_R, -VERRUNDUNG3_R), VERRUNDUNG3_R, 90, 90)
            Line((0, -VERRUNDUNG3_R), (0, 0))
            Line((0, 0), (VERRUNDUNG3_R, 0))
        make_face()
    verrundung3_piece_15 = extrude(amount=33.006096654, mode=Mode.PRIVATE)
    verrundung3_piece_15 = split(verrundung3_piece_15, bisect_by=Plane(origin=(-10, 12.928932188, -102), z_dir=(0, 0, 1)), keep=Keep.TOP, mode=Mode.PRIVATE)
    add(verrundung3_piece_15, mode=Mode.SUBTRACT)
    with BuildSketch(Plane(origin=(-10, 12.928932188, -79.928932188), x_dir=(0, -0.7071067811865516, -0.7071067811865436), z_dir=(0, 0.7071067811865436, -0.7071067811865515))) as verrundung3_piece_16_section:
        with BuildLine():
            CenterArc((VERRUNDUNG3_R, -VERRUNDUNG3_R), VERRUNDUNG3_R, 90, 90)
            Line((0, -VERRUNDUNG3_R), (0, 0))
            Line((0, 0), (VERRUNDUNG3_R, 0))
        make_face()
    verrundung3_piece_16 = extrude(amount=33.006096654, mode=Mode.PRIVATE)
    verrundung3_piece_16 = split(verrundung3_piece_16, bisect_by=Plane(origin=(-9.25, 12.928932188, -79.928932188), z_dir=(1, 0, 0)), keep=Keep.TOP, mode=Mode.PRIVATE)
    add(verrundung3_piece_16, mode=Mode.SUBTRACT)
    with BuildSketch(Plane(origin=(10, 12.928932188, -79.928932188), x_dir=(0, -0.7071067811865513, -0.7071067811865438), z_dir=(0, 0.7071067811865438, -0.7071067811865513))) as verrundung3_piece_17_section:
        with BuildLine():
            CenterArc((VERRUNDUNG3_R, VERRUNDUNG3_R), VERRUNDUNG3_R, 180, 90)
            Line((0, VERRUNDUNG3_R), (0, 0))
            Line((0, 0), (VERRUNDUNG3_R, 0))
        make_face()
    verrundung3_piece_17 = extrude(amount=33.006096654, mode=Mode.PRIVATE)
    verrundung3_piece_17 = split(verrundung3_piece_17, bisect_by=Plane(origin=(10, 12.928932188, -102), z_dir=(0, 0, 1)), keep=Keep.TOP, mode=Mode.PRIVATE)
    add(verrundung3_piece_17, mode=Mode.SUBTRACT)
    with BuildSketch(Plane(origin=(10, 12.928932188, -79.928932188), x_dir=(0, -0.7071067811865513, -0.7071067811865438), z_dir=(0, 0.7071067811865438, -0.7071067811865513))) as verrundung3_piece_18_section:
        with BuildLine():
            CenterArc((VERRUNDUNG3_R, VERRUNDUNG3_R), VERRUNDUNG3_R, 180, 90)
            Line((0, VERRUNDUNG3_R), (0, 0))
            Line((0, 0), (VERRUNDUNG3_R, 0))
        make_face()
    verrundung3_piece_18 = extrude(amount=33.006096654, mode=Mode.PRIVATE)
    verrundung3_piece_18 = split(verrundung3_piece_18, bisect_by=Plane(origin=(10, 34.5, -79.928932188), z_dir=(0, 1, 0)), keep=Keep.TOP, mode=Mode.PRIVATE)
    add(verrundung3_piece_18, mode=Mode.SUBTRACT)
    with BuildSketch(Plane(origin=(65, 35, -110.5), x_dir=(0, -1, 0), z_dir=(0, 0, 1))) as verrundung3_piece_19:
        with BuildLine():
            CenterArc((VERRUNDUNG3_R, -VERRUNDUNG3_R), VERRUNDUNG3_R, 90, 90)
            Line((0, -VERRUNDUNG3_R), (0, 0))
            Line((0, 0), (VERRUNDUNG3_R, 0))
        make_face()
    extrude(amount=11, mode=Mode.SUBTRACT)
    with BuildSketch(Plane(origin=(-65, 35, -110.5), x_dir=(0, -1, 0), z_dir=(0, 0, 1))) as verrundung3_piece_20:
        with BuildLine():
            CenterArc((VERRUNDUNG3_R, VERRUNDUNG3_R), VERRUNDUNG3_R, 180, 90)
            Line((0, VERRUNDUNG3_R), (0, 0))
            Line((0, 0), (VERRUNDUNG3_R, 0))
        make_face()
    extrude(amount=11, mode=Mode.SUBTRACT)
    with BuildSketch(Plane(origin=(60, 10, 40), x_dir=(0, 0, -1), z_dir=(-1, 0, 0))) as verrundung3_piece_21:
        with BuildLine():
            CenterArc((VERRUNDUNG3_R, VERRUNDUNG3_R), VERRUNDUNG3_R, 180, 90)
            Line((0, VERRUNDUNG3_R), (0, 0))
            Line((0, 0), (VERRUNDUNG3_R, 0))
        make_face()
    extrude(amount=120, mode=Mode.SUBTRACT)

    # Skizze10 → Aufsatz-Linear austragen4 (add)
    # profile 1 of 2: a face of its own
    with SkipClean():  # the faces are left unmerged after this step: merging them gives an invalid solid
        with BuildSketch(Plane.XY.offset(-102)):
            with Locations(Location((-40, 20, 0), (0, 0, 180))):
                Circle(SKIZZE10_R)
            with Locations((-40, 20)):
                Circle(SKIZZE10_R_2, mode=Mode.SUBTRACT)
        # profile 2 of 2: a face of its own
        with BuildSketch(Plane.XY.offset(-102)):
            with Locations(Location((40, 20, 0), (0, 0, 180))):
                Circle(SKIZZE10_R)
            with Locations(Location((40, 20, 0), (0, 0, 180))):
                Circle(SKIZZE10_R_2, mode=Mode.SUBTRACT)
        extrude(amount=AUFSATZ_LINEAR_AUSTRAGEN4_DEPTH)
    add(part.part.scale(1), mode=Mode.REPLACE)  # the faces are merged on a copy

    # Fase1
    # the kernel refuses this chamfer: 3 mm, written as the material it adds along each edge
    with BuildSketch(Plane(origin=(-40, 20, -102), x_dir=(-1, 0, 0), z_dir=(0, 1, 0))) as fase1_piece_1_section:
        Polygon((7.5 + FASE1_SIZE, 0), (7.5, FASE1_SIZE), (7.5, 0), align=None)
    fase1_piece_1 = revolve(axis=Axis((-40, 20, -102), (0, 0, 1)), mode=Mode.PRIVATE)
    fase1_piece_1 = split(fase1_piece_1, bisect_by=Plane(origin=(-40, 20, -99), z_dir=(0, 0, -1)), keep=Keep.TOP, mode=Mode.PRIVATE)
    add(fase1_piece_1)
    with BuildSketch(Plane(origin=(40, 20, -102), x_dir=(-1, 0, 0), z_dir=(0, 1, 0))) as fase1_piece_2_section:
        Polygon((7.5 + FASE1_SIZE, 0), (7.5, FASE1_SIZE), (7.5, 0), align=None)
    fase1_piece_2 = revolve(axis=Axis((40, 20, -102), (0, 0, 1)), mode=Mode.PRIVATE)
    fase1_piece_2 = split(fase1_piece_2, bisect_by=Plane(origin=(40, 20, -99), z_dir=(0, 0, -1)), keep=Keep.TOP, mode=Mode.PRIVATE)
    add(fase1_piece_2)

    # Skizze11 → Schnitt-Linear austragen8 (cut, through all)
    with BuildSketch(Plane(origin=(0, 0, 0), x_dir=(1, 0, 0), z_dir=(0, 1, 0))):
        with Locations(Location((-55, 60, 0), (0, 0, 90))):
            Circle(SKIZZE11_R)
        with Locations(Location((55, 60, 0), (0, 0, 90))):
            Circle(SKIZZE11_R)
    extrude(amount=SCHNITT_LINEAR_AUSTRAGEN8_DEPTH, mode=Mode.SUBTRACT)


solid = part.part
